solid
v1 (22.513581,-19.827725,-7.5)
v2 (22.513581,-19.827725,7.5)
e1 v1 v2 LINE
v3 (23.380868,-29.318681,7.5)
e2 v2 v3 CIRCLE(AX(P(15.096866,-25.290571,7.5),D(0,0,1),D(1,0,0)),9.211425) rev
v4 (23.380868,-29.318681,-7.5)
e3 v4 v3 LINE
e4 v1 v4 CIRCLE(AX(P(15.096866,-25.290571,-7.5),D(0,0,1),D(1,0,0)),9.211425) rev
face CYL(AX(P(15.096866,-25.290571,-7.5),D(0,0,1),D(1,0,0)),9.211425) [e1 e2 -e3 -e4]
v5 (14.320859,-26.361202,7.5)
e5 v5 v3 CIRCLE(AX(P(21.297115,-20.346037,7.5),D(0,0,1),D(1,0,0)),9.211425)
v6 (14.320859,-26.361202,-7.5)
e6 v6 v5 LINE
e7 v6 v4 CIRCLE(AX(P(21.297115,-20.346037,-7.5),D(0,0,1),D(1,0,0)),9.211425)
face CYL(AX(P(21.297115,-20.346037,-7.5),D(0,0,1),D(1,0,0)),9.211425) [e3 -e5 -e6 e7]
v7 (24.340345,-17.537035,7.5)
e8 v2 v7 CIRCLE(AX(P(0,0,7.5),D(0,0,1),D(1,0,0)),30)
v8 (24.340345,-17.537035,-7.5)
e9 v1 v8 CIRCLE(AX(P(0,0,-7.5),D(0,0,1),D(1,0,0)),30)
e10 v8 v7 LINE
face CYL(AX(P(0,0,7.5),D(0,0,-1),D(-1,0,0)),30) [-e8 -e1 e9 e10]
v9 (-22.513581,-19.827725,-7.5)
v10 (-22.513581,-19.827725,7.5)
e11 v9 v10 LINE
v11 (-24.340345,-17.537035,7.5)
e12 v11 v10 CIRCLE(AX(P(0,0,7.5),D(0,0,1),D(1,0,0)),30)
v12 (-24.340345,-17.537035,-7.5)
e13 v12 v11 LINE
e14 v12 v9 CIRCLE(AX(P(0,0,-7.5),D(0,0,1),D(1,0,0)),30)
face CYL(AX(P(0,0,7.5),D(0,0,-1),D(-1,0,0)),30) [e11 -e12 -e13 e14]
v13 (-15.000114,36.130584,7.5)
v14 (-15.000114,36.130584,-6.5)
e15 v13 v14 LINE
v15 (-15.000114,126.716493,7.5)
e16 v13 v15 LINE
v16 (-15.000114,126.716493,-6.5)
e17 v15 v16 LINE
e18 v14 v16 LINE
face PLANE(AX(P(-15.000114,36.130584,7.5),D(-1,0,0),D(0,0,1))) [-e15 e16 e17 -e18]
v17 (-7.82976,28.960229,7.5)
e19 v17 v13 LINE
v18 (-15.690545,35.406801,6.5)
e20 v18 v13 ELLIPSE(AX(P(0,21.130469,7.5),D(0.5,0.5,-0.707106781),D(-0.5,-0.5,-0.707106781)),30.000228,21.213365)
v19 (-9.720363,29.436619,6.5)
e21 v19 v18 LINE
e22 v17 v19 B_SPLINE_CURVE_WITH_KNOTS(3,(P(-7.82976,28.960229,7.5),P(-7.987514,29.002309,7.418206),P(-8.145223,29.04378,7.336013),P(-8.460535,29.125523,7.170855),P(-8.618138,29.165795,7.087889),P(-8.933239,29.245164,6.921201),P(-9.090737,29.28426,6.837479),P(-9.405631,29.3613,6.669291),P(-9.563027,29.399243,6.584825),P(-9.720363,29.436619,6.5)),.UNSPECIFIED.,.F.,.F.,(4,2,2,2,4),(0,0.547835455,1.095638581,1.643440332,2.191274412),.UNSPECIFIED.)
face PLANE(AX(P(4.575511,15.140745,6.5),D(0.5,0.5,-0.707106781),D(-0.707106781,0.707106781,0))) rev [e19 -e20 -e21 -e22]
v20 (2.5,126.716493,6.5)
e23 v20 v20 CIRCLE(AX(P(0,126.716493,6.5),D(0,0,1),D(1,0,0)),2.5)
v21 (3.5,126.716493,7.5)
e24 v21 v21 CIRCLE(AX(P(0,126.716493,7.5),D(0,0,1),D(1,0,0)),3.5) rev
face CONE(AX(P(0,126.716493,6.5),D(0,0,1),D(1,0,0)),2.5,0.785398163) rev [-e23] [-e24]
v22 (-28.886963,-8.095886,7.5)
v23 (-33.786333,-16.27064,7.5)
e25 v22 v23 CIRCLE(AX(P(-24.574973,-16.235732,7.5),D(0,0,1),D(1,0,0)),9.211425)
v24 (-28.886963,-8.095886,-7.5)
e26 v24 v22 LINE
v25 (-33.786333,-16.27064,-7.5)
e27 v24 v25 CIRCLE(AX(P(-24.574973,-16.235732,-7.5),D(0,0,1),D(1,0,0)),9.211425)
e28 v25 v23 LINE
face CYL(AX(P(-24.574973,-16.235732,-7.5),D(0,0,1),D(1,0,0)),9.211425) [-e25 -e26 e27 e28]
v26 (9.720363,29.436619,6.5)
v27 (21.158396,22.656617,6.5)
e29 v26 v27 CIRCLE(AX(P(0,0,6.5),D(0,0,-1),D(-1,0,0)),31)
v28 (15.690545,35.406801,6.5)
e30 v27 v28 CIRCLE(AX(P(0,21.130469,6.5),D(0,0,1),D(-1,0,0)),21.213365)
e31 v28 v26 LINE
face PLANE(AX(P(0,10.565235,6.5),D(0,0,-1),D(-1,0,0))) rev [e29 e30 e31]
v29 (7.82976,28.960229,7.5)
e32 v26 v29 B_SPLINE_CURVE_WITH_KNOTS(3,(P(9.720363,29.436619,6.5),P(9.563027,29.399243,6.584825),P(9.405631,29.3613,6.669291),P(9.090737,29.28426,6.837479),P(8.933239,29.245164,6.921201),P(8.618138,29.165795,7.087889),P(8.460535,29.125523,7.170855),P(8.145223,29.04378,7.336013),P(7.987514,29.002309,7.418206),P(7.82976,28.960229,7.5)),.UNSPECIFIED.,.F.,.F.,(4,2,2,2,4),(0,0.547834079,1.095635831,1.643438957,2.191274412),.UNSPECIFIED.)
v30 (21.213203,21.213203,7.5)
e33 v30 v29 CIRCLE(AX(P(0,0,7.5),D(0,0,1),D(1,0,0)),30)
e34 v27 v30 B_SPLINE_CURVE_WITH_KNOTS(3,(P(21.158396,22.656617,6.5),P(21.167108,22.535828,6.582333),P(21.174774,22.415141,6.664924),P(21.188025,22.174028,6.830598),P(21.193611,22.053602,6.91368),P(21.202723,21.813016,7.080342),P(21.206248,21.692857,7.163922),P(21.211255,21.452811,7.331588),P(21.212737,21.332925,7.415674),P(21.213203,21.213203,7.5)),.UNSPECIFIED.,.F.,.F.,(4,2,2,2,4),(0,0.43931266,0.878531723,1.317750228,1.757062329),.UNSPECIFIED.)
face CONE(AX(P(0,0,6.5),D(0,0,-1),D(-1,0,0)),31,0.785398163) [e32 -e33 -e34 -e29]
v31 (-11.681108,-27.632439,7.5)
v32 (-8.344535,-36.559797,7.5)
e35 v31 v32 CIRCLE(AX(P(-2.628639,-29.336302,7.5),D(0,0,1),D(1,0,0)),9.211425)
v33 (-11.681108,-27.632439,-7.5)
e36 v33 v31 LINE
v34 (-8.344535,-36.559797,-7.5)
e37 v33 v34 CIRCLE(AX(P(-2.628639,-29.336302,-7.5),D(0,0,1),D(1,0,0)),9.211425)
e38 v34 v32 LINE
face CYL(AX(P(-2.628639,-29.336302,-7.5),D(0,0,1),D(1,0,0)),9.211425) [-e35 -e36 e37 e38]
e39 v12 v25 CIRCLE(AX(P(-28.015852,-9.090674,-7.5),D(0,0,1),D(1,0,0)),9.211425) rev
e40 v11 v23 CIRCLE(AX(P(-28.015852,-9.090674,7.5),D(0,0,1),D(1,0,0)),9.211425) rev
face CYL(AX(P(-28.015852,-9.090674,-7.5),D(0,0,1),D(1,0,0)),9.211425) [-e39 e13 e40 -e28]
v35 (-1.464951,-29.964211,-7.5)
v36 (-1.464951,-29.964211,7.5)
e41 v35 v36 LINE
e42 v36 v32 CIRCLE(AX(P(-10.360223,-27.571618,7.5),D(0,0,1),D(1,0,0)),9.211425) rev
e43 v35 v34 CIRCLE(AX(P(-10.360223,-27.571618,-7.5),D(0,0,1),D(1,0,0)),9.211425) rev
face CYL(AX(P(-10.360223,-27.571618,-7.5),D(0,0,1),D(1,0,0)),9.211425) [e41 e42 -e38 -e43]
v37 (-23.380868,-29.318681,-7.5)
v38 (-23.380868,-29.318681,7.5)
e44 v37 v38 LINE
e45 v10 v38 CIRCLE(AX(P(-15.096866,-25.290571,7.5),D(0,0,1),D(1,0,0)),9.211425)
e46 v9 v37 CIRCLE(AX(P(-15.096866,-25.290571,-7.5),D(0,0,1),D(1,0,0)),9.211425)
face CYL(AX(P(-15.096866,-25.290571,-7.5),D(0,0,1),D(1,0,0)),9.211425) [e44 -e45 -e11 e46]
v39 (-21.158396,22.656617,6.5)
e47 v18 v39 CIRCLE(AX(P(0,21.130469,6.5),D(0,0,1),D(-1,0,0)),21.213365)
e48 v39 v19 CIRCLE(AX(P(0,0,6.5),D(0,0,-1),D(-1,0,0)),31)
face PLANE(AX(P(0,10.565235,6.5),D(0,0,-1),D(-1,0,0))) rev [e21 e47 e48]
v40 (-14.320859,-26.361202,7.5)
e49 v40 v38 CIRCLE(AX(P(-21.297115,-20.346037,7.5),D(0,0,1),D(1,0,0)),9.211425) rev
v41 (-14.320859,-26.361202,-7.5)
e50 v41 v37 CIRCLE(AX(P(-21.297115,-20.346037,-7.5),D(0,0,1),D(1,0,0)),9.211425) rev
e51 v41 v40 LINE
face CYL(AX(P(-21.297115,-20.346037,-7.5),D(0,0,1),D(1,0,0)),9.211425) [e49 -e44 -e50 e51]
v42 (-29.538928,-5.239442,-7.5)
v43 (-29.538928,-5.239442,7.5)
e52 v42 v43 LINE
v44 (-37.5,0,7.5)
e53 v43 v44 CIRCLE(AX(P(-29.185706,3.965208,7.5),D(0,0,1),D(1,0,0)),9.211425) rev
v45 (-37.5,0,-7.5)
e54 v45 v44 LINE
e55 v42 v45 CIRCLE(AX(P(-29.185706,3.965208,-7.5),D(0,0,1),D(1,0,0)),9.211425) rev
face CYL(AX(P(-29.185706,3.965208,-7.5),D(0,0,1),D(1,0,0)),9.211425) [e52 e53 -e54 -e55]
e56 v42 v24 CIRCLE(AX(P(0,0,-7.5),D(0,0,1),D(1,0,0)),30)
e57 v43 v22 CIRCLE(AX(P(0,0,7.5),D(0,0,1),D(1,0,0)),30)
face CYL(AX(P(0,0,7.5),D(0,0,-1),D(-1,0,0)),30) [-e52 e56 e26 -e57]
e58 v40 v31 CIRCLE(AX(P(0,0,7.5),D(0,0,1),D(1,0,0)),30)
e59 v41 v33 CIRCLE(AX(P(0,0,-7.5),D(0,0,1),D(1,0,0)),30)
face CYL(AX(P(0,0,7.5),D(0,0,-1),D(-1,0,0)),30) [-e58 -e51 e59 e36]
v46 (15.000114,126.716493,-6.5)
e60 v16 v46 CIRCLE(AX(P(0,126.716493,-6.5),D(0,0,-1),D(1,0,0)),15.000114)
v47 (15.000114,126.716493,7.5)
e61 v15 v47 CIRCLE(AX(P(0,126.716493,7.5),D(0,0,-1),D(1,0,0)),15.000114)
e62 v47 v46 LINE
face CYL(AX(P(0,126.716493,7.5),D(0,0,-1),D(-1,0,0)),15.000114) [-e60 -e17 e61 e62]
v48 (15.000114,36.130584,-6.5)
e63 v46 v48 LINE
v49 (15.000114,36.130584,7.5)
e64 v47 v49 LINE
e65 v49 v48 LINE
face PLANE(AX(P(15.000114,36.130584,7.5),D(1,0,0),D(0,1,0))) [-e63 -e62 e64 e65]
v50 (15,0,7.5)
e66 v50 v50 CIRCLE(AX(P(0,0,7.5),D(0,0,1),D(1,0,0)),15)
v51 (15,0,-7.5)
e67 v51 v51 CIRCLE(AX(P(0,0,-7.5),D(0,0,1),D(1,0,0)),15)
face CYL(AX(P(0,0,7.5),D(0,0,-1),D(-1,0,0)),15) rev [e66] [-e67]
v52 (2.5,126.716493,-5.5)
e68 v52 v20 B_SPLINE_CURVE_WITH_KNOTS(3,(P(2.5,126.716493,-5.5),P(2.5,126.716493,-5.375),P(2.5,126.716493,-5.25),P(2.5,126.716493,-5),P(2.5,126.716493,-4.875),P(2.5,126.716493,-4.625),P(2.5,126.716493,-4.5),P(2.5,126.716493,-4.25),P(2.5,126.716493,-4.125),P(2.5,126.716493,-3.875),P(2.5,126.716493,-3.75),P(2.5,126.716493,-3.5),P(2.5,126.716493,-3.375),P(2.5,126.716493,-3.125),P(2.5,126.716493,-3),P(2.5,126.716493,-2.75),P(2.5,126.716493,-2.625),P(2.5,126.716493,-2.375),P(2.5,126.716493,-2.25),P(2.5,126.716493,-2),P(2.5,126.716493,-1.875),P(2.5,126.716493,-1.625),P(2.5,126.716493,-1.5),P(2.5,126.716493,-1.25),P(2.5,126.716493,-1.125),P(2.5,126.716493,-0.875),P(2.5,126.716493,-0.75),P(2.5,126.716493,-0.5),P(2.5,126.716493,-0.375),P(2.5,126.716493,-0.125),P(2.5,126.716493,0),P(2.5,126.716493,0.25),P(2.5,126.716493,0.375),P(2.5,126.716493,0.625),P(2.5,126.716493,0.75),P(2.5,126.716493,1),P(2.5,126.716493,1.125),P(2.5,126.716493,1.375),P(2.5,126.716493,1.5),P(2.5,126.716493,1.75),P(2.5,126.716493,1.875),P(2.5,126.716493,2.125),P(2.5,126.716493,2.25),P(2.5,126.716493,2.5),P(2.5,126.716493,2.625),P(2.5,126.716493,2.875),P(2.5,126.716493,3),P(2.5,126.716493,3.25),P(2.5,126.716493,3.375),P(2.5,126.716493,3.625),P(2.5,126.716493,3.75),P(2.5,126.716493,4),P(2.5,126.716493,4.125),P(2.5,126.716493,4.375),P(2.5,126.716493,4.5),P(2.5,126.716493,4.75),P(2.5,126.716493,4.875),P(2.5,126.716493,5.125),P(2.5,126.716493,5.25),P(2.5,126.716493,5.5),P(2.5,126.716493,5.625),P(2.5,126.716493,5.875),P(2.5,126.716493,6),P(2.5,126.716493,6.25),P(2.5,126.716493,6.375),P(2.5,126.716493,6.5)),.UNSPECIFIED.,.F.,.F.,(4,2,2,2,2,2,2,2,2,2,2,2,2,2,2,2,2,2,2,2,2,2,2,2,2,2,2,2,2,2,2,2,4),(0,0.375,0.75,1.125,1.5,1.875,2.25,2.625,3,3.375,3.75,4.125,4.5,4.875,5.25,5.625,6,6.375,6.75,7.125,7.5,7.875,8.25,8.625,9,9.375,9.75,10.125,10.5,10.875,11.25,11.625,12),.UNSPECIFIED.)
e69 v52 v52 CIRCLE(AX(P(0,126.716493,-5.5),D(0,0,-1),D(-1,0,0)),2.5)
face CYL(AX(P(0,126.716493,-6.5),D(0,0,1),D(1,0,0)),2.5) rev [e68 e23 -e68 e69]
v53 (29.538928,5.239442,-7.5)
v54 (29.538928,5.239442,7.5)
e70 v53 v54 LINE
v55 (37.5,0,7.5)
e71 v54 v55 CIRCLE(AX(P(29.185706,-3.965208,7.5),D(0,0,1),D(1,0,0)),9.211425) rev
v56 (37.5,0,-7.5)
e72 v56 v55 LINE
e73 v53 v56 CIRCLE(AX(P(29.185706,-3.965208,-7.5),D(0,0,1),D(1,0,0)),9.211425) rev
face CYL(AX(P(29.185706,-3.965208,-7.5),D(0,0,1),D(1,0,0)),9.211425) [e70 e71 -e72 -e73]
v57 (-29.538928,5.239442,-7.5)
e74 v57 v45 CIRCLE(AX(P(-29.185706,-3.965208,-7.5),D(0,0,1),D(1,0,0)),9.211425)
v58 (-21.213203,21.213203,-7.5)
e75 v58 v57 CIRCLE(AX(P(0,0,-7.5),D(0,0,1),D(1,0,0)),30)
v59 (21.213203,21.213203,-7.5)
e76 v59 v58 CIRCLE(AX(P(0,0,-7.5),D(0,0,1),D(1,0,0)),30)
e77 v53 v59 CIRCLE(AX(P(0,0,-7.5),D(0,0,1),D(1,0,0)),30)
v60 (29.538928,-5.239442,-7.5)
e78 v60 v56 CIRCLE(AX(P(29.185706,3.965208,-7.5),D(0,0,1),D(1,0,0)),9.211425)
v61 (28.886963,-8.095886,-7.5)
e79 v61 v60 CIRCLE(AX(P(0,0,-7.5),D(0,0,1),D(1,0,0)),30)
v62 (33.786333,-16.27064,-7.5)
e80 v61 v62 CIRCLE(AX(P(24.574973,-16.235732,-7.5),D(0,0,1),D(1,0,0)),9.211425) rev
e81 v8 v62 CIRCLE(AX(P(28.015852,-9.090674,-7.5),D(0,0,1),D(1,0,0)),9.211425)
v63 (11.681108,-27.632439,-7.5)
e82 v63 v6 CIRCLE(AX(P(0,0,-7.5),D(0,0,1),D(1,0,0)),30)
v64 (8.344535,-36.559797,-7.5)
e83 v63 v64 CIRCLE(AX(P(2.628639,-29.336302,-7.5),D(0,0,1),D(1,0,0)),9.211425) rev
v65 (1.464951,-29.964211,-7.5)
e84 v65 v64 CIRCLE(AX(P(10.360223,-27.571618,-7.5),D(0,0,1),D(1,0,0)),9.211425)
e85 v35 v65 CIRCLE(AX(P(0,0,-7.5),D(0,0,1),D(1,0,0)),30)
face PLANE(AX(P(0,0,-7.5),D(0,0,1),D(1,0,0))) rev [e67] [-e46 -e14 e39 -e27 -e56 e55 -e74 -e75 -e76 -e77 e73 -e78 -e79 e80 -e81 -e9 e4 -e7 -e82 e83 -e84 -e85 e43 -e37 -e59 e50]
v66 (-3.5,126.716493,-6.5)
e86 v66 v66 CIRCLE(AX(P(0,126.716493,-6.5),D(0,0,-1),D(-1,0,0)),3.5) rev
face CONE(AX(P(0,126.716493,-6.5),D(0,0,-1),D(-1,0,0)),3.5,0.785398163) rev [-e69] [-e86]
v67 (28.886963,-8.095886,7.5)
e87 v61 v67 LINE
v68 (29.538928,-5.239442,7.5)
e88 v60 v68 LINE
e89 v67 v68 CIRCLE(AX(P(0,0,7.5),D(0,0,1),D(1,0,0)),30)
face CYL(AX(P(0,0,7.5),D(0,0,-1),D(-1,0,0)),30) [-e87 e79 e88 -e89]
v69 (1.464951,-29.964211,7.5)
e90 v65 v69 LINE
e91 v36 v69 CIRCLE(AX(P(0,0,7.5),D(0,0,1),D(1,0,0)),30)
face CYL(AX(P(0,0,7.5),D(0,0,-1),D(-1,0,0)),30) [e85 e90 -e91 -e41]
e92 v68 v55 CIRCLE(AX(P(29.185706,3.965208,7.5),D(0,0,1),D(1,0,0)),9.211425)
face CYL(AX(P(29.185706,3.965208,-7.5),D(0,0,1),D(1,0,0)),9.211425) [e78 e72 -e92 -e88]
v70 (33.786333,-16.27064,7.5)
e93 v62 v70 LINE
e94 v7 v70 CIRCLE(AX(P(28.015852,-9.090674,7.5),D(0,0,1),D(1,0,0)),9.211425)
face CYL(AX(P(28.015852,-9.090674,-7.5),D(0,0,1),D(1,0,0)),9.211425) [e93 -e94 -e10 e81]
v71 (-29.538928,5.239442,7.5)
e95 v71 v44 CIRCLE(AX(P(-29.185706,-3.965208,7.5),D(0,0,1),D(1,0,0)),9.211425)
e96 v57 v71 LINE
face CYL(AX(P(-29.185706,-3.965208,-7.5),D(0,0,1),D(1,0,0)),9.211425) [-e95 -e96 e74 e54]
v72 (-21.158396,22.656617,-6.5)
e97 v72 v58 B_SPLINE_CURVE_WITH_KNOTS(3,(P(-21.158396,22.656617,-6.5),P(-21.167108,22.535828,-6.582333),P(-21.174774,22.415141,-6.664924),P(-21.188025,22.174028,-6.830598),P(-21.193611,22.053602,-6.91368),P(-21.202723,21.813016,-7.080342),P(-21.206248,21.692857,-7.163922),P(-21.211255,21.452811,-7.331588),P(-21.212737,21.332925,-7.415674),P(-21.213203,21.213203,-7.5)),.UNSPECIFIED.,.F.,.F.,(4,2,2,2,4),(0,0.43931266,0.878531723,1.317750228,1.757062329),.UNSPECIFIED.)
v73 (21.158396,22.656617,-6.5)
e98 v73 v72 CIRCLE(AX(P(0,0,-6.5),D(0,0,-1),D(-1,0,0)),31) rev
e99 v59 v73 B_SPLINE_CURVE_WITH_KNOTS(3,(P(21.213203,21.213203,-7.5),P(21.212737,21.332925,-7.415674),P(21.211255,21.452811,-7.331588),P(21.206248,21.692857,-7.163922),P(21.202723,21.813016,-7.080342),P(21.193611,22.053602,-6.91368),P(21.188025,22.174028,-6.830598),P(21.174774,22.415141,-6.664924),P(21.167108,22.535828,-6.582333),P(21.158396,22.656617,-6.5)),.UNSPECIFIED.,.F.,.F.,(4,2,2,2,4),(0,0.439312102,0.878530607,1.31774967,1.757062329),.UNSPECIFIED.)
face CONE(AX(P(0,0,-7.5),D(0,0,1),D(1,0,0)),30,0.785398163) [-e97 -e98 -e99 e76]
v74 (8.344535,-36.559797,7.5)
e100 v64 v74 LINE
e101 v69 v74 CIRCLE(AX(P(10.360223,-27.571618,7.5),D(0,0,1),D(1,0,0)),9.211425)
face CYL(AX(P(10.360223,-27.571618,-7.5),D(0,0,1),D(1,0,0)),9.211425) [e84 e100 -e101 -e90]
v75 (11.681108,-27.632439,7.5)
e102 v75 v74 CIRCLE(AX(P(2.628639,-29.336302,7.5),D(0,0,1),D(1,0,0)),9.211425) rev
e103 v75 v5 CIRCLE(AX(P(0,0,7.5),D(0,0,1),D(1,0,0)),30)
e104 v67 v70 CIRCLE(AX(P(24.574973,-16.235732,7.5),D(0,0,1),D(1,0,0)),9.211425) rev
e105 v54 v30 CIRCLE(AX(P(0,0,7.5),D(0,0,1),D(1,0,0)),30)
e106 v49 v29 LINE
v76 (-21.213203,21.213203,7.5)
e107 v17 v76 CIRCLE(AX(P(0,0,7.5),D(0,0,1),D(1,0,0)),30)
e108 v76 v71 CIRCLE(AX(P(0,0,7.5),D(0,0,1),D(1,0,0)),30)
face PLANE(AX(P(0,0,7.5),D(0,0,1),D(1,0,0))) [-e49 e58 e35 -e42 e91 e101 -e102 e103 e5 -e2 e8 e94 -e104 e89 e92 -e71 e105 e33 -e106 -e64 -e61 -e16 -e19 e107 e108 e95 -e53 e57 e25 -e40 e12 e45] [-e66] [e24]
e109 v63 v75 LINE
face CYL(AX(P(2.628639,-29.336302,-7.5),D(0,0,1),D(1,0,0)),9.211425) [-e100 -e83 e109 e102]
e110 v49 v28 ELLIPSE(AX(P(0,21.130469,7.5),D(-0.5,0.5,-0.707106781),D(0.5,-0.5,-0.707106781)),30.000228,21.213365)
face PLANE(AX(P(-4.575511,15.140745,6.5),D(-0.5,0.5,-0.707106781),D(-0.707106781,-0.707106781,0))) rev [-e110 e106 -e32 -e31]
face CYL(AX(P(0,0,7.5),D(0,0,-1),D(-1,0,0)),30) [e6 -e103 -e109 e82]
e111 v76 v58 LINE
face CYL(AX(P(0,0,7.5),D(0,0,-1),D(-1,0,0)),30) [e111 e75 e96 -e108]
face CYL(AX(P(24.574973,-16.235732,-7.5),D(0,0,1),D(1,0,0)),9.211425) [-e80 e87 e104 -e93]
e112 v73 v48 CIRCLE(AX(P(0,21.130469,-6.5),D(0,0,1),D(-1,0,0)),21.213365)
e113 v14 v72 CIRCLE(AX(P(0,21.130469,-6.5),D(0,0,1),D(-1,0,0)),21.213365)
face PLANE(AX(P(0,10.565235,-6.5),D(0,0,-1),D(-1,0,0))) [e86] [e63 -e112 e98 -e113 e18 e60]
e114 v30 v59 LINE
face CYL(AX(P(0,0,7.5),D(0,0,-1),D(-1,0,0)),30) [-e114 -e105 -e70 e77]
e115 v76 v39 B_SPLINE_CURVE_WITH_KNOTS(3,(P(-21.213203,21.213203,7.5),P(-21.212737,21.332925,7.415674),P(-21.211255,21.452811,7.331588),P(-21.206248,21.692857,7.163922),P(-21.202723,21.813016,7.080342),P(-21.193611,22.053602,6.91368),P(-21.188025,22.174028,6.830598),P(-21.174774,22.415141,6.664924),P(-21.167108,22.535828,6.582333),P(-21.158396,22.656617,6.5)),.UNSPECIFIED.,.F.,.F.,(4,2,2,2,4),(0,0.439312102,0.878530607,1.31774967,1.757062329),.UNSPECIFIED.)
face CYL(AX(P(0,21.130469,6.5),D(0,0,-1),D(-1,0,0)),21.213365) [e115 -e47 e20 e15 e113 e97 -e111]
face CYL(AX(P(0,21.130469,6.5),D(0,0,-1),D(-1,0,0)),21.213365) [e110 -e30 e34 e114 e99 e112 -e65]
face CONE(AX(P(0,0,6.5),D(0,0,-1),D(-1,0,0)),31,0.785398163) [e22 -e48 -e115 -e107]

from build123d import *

# Parameters (mm, degrees)
SKETCH2_R           = 30
SKETCH2_R_2         = 15
BOSS_EXTRUDE1_DEPTH = 7.5
BOSS_EXTRUDE2_DEPTH = 6.5
CHAMFER2_SIZE       = 1
BOSS_EXTRUDE3_DEPTH = 14
CHAMFER3_SIZE       = 1
SKETCH6_R           = 2.5
CUT_EXTRUDE1_DEPTH  = 14
CHAMFER4_SIZE       = 1
CHAMFER5_SIZE       = 1
BOSS_EXTRUDE4_DEPTH = 15


# Some blends are built 0.0001 mm under size
with BuildPart() as part:
    # Sketch2 → Boss-Extrude1 (new, symmetric)
    with BuildSketch(Plane.XY):
        Circle(SKETCH2_R)
        Circle(SKETCH2_R_2, mode=Mode.SUBTRACT)
    extrude(amount=BOSS_EXTRUDE1_DEPTH, both=True)

    # Sketch4 → Boss-Extrude2 (add, symmetric)
    with BuildSketch(Plane.XY):
        with BuildLine():
            ThreePointArc((-21.213203436, 21.213203436), (0, 42.343834222), (21.213203436, 21.213203436))
            ThreePointArc((21.213203436, 21.213203436), (0, 30), (-21.213203436, 21.213203436))
        make_face()
    extrude(amount=BOSS_EXTRUDE2_DEPTH, both=True)

    # Chamfer2
    chamfer2_edges = [part.edges().sort_by_distance(p)[0] for p in [
        (0, 30, -6.5),
        (0, 30, 6.5),
    ]]
    chamfer(chamfer2_edges, length=CHAMFER2_SIZE - 0.0001)  # a hair under: the kernel refuses the full size

    # Sketch5 → Boss-Extrude3 (add)
    with BuildSketch(Plane(origin=(0, 0, -6.5), x_dir=(-1, 0, 0), z_dir=(0, 0, -1))):
        with BuildLine():
            Line((0, 21.130469451), (-15.000114081, 36.130583532))
            Line((-15.000114081, 36.130583532), (-15.000114081, 126.716493473))
            ThreePointArc((-15.000114081, 126.716493473), (0, 141.716607555), (15.000114081, 126.716493473))
            Line((15.000114081, 126.716493473), (15.000114081, 36.130583532))
            Line((15.000114081, 36.130583532), (0, 21.130469451))
        make_face()
    extrude(amount=-BOSS_EXTRUDE3_DEPTH)

    # Chamfer3
    # the kernel refuses this chamfer: 1 mm, written as the material it adds along each edge
    with BuildSketch(Plane(origin=(6.82237013, 27.952839581, 6.5), x_dir=(0.7068394360706772, -0.7068394360706699, -0.02749587661058651), z_dir=(0.7071067811865439, 0.7071067811865512, 0))) as chamfer3_piece_1_section:
        Polygon((CHAMFER3_SIZE * 0.999621916911, -CHAMFER3_SIZE * 0.0274958766106), (-CHAMFER3_SIZE * 0.0274958766106, -CHAMFER3_SIZE * 0.999621916911), (0, 0), align=None)
    chamfer3_piece_1 = extrude(amount=14.136759393, mode=Mode.PRIVATE)
    chamfer3_piece_1 = chamfer3_piece_1 & Plane(origin=(0, 21.130469451, 6.845303942), x_dir=(-0.9999923946286841, 0.003900087792649399, 0), z_dir=(0, 0, 1)) * Cylinder(21.213364771, 33, mode=Mode.PRIVATE)
    add(chamfer3_piece_1)
    with BuildSketch(Plane(origin=(-16.818568561, 37.949038012, 6.5), x_dir=(0.019442520806013823, 0.019442520806013757, 0.9996219169112968), z_dir=(0.7071067811865464, -0.7071067811865487, 0))) as chamfer3_piece_2_section:
        Polygon((CHAMFER3_SIZE * 0.999621916911, CHAMFER3_SIZE * 0.0274958766106), (-CHAMFER3_SIZE * 0.0274958766106, CHAMFER3_SIZE * 0.999621916911), (0, 0), align=None)
    chamfer3_piece_2 = extrude(amount=14.136759393, mode=Mode.PRIVATE)
    chamfer3_piece_2 = chamfer3_piece_2 & Plane(origin=(0, 21.130469451, 6.750596564), x_dir=(-0.9999923946286841, 0.003900087792649399, 0), z_dir=(0, 0, 1)) * Cylinder(21.213364771, 33, mode=Mode.PRIVATE)
    add(chamfer3_piece_2)

    # Sketch6 → Cut-Extrude1 (cut)
    with BuildSketch(Plane.XY.offset(7.5)):
        with Locations((0, 126.716493473)):
            Circle(SKETCH6_R)
    extrude(amount=-CUT_EXTRUDE1_DEPTH, mode=Mode.SUBTRACT)

    # Chamfer4
    chamfer4_edges = [part.edges().sort_by_distance(p)[0] for p in [
        (-2.5, 126.716493473, 7.5),
    ]]
    chamfer(chamfer4_edges, length=CHAMFER4_SIZE)

    # Chamfer5
    chamfer5_edges = [part.edges().sort_by_distance(p)[0] for p in [
        (-2.5, 126.716493473, -6.5),
    ]]
    chamfer(chamfer5_edges, length=CHAMFER5_SIZE)

    # Sketch7 → Boss-Extrude4 (add)
    with BuildSketch(Plane.XY.offset(7.5)):
        with BuildLine():
            ThreePointArc((-29.538927614, 5.23944228), (-34.249735627, 3.72933291), (-37.5, 0))
            ThreePointArc((-37.5, 0), (-34.249735627, -3.72933291), (-29.538927614, -5.23944228))
            ThreePointArc((-29.538927614, -5.23944228), (-30, 0), (-29.538927614, 5.23944228))
        make_face()
        with BuildLine():
            ThreePointArc((-28.886962979, -8.095885983), (-32.476042442, -11.500390508), (-33.786332546, -16.270640217))
            ThreePointArc((-33.786332546, -16.270640217), (-29.239848627, -18.220416208), (-24.340345364, -17.537034743))
            ThreePointArc((-24.340345364, -17.537034743), (-27.029066037, -13.016512174), (-28.886962979, -8.095885983))
        make_face()
        with BuildLine():
            ThreePointArc((-22.513581051, -19.827724738), (-24.270070758, -24.452320542), (-23.38086757, -29.318680593))
            ThreePointArc((-23.38086757, -29.318680593), (-18.438651002, -29.102722617), (-14.3208592, -26.361202396))
            ThreePointArc((-14.3208592, -26.361202396), (-18.704694056, -23.454944474), (-22.513581051, -19.827724738))
        make_face()
        with BuildLine():
            ThreePointArc((-11.681108284, -27.632439437), (-11.257113908, -32.561168606), (-8.344535023, -36.559796707))
            ThreePointArc((-8.344535023, -36.559796707), (-3.985452411, -34.22087789), (-1.464951237, -29.964210617))
            ThreePointArc((-1.464951237, -29.964210617), (-6.675628019, -29.247837365), (-11.681108284, -27.632439437))
        make_face()
        with BuildLine():
            ThreePointArc((1.464951237, -29.964210617), (3.985452411, -34.22087789), (8.344535023, -36.559796707))
            ThreePointArc((8.344535023, -36.559796707), (11.257113908, -32.561168606), (11.681108284, -27.632439437))
            ThreePointArc((11.681108284, -27.632439437), (6.675628019, -29.247837365), (1.464951237, -29.964210617))
        make_face()
        with BuildLine():
            ThreePointArc((14.3208592, -26.361202396), (18.438651002, -29.102722617), (23.38086757, -29.318680593))
            ThreePointArc((23.38086757, -29.318680593), (24.270070758, -24.452320542), (22.513581051, -19.827724738))
            ThreePointArc((22.513581051, -19.827724738), (18.704694056, -23.454944474), (14.3208592, -26.361202396))
        make_face()
        with BuildLine():
            ThreePointArc((33.786332546, -16.270640217), (32.476042442, -11.500390508), (28.886962979, -8.095885983))
            ThreePointArc((28.886962979, -8.095885983), (27.029066037, -13.016512174), (24.340345364, -17.537034743))
            ThreePointArc((24.340345364, -17.537034743), (29.239848627, -18.220416208), (33.786332546, -16.270640217))
        make_face()
        with BuildLine():
            ThreePointArc((29.538927614, 5.23944228), (29.884509603, 2.629845202), (30, 0))
            ThreePointArc((30, 0), (29.884509603, -2.629845202), (29.538927614, -5.23944228))
            ThreePointArc((29.538927614, -5.23944228), (34.249735627, -3.72933291), (37.5, 0))
            ThreePointArc((37.5, 0), (34.249735627, 3.72933291), (29.538927614, 5.23944228))
        make_face()
    extrude(amount=-BOSS_EXTRUDE4_DEPTH)


solid = part.part
